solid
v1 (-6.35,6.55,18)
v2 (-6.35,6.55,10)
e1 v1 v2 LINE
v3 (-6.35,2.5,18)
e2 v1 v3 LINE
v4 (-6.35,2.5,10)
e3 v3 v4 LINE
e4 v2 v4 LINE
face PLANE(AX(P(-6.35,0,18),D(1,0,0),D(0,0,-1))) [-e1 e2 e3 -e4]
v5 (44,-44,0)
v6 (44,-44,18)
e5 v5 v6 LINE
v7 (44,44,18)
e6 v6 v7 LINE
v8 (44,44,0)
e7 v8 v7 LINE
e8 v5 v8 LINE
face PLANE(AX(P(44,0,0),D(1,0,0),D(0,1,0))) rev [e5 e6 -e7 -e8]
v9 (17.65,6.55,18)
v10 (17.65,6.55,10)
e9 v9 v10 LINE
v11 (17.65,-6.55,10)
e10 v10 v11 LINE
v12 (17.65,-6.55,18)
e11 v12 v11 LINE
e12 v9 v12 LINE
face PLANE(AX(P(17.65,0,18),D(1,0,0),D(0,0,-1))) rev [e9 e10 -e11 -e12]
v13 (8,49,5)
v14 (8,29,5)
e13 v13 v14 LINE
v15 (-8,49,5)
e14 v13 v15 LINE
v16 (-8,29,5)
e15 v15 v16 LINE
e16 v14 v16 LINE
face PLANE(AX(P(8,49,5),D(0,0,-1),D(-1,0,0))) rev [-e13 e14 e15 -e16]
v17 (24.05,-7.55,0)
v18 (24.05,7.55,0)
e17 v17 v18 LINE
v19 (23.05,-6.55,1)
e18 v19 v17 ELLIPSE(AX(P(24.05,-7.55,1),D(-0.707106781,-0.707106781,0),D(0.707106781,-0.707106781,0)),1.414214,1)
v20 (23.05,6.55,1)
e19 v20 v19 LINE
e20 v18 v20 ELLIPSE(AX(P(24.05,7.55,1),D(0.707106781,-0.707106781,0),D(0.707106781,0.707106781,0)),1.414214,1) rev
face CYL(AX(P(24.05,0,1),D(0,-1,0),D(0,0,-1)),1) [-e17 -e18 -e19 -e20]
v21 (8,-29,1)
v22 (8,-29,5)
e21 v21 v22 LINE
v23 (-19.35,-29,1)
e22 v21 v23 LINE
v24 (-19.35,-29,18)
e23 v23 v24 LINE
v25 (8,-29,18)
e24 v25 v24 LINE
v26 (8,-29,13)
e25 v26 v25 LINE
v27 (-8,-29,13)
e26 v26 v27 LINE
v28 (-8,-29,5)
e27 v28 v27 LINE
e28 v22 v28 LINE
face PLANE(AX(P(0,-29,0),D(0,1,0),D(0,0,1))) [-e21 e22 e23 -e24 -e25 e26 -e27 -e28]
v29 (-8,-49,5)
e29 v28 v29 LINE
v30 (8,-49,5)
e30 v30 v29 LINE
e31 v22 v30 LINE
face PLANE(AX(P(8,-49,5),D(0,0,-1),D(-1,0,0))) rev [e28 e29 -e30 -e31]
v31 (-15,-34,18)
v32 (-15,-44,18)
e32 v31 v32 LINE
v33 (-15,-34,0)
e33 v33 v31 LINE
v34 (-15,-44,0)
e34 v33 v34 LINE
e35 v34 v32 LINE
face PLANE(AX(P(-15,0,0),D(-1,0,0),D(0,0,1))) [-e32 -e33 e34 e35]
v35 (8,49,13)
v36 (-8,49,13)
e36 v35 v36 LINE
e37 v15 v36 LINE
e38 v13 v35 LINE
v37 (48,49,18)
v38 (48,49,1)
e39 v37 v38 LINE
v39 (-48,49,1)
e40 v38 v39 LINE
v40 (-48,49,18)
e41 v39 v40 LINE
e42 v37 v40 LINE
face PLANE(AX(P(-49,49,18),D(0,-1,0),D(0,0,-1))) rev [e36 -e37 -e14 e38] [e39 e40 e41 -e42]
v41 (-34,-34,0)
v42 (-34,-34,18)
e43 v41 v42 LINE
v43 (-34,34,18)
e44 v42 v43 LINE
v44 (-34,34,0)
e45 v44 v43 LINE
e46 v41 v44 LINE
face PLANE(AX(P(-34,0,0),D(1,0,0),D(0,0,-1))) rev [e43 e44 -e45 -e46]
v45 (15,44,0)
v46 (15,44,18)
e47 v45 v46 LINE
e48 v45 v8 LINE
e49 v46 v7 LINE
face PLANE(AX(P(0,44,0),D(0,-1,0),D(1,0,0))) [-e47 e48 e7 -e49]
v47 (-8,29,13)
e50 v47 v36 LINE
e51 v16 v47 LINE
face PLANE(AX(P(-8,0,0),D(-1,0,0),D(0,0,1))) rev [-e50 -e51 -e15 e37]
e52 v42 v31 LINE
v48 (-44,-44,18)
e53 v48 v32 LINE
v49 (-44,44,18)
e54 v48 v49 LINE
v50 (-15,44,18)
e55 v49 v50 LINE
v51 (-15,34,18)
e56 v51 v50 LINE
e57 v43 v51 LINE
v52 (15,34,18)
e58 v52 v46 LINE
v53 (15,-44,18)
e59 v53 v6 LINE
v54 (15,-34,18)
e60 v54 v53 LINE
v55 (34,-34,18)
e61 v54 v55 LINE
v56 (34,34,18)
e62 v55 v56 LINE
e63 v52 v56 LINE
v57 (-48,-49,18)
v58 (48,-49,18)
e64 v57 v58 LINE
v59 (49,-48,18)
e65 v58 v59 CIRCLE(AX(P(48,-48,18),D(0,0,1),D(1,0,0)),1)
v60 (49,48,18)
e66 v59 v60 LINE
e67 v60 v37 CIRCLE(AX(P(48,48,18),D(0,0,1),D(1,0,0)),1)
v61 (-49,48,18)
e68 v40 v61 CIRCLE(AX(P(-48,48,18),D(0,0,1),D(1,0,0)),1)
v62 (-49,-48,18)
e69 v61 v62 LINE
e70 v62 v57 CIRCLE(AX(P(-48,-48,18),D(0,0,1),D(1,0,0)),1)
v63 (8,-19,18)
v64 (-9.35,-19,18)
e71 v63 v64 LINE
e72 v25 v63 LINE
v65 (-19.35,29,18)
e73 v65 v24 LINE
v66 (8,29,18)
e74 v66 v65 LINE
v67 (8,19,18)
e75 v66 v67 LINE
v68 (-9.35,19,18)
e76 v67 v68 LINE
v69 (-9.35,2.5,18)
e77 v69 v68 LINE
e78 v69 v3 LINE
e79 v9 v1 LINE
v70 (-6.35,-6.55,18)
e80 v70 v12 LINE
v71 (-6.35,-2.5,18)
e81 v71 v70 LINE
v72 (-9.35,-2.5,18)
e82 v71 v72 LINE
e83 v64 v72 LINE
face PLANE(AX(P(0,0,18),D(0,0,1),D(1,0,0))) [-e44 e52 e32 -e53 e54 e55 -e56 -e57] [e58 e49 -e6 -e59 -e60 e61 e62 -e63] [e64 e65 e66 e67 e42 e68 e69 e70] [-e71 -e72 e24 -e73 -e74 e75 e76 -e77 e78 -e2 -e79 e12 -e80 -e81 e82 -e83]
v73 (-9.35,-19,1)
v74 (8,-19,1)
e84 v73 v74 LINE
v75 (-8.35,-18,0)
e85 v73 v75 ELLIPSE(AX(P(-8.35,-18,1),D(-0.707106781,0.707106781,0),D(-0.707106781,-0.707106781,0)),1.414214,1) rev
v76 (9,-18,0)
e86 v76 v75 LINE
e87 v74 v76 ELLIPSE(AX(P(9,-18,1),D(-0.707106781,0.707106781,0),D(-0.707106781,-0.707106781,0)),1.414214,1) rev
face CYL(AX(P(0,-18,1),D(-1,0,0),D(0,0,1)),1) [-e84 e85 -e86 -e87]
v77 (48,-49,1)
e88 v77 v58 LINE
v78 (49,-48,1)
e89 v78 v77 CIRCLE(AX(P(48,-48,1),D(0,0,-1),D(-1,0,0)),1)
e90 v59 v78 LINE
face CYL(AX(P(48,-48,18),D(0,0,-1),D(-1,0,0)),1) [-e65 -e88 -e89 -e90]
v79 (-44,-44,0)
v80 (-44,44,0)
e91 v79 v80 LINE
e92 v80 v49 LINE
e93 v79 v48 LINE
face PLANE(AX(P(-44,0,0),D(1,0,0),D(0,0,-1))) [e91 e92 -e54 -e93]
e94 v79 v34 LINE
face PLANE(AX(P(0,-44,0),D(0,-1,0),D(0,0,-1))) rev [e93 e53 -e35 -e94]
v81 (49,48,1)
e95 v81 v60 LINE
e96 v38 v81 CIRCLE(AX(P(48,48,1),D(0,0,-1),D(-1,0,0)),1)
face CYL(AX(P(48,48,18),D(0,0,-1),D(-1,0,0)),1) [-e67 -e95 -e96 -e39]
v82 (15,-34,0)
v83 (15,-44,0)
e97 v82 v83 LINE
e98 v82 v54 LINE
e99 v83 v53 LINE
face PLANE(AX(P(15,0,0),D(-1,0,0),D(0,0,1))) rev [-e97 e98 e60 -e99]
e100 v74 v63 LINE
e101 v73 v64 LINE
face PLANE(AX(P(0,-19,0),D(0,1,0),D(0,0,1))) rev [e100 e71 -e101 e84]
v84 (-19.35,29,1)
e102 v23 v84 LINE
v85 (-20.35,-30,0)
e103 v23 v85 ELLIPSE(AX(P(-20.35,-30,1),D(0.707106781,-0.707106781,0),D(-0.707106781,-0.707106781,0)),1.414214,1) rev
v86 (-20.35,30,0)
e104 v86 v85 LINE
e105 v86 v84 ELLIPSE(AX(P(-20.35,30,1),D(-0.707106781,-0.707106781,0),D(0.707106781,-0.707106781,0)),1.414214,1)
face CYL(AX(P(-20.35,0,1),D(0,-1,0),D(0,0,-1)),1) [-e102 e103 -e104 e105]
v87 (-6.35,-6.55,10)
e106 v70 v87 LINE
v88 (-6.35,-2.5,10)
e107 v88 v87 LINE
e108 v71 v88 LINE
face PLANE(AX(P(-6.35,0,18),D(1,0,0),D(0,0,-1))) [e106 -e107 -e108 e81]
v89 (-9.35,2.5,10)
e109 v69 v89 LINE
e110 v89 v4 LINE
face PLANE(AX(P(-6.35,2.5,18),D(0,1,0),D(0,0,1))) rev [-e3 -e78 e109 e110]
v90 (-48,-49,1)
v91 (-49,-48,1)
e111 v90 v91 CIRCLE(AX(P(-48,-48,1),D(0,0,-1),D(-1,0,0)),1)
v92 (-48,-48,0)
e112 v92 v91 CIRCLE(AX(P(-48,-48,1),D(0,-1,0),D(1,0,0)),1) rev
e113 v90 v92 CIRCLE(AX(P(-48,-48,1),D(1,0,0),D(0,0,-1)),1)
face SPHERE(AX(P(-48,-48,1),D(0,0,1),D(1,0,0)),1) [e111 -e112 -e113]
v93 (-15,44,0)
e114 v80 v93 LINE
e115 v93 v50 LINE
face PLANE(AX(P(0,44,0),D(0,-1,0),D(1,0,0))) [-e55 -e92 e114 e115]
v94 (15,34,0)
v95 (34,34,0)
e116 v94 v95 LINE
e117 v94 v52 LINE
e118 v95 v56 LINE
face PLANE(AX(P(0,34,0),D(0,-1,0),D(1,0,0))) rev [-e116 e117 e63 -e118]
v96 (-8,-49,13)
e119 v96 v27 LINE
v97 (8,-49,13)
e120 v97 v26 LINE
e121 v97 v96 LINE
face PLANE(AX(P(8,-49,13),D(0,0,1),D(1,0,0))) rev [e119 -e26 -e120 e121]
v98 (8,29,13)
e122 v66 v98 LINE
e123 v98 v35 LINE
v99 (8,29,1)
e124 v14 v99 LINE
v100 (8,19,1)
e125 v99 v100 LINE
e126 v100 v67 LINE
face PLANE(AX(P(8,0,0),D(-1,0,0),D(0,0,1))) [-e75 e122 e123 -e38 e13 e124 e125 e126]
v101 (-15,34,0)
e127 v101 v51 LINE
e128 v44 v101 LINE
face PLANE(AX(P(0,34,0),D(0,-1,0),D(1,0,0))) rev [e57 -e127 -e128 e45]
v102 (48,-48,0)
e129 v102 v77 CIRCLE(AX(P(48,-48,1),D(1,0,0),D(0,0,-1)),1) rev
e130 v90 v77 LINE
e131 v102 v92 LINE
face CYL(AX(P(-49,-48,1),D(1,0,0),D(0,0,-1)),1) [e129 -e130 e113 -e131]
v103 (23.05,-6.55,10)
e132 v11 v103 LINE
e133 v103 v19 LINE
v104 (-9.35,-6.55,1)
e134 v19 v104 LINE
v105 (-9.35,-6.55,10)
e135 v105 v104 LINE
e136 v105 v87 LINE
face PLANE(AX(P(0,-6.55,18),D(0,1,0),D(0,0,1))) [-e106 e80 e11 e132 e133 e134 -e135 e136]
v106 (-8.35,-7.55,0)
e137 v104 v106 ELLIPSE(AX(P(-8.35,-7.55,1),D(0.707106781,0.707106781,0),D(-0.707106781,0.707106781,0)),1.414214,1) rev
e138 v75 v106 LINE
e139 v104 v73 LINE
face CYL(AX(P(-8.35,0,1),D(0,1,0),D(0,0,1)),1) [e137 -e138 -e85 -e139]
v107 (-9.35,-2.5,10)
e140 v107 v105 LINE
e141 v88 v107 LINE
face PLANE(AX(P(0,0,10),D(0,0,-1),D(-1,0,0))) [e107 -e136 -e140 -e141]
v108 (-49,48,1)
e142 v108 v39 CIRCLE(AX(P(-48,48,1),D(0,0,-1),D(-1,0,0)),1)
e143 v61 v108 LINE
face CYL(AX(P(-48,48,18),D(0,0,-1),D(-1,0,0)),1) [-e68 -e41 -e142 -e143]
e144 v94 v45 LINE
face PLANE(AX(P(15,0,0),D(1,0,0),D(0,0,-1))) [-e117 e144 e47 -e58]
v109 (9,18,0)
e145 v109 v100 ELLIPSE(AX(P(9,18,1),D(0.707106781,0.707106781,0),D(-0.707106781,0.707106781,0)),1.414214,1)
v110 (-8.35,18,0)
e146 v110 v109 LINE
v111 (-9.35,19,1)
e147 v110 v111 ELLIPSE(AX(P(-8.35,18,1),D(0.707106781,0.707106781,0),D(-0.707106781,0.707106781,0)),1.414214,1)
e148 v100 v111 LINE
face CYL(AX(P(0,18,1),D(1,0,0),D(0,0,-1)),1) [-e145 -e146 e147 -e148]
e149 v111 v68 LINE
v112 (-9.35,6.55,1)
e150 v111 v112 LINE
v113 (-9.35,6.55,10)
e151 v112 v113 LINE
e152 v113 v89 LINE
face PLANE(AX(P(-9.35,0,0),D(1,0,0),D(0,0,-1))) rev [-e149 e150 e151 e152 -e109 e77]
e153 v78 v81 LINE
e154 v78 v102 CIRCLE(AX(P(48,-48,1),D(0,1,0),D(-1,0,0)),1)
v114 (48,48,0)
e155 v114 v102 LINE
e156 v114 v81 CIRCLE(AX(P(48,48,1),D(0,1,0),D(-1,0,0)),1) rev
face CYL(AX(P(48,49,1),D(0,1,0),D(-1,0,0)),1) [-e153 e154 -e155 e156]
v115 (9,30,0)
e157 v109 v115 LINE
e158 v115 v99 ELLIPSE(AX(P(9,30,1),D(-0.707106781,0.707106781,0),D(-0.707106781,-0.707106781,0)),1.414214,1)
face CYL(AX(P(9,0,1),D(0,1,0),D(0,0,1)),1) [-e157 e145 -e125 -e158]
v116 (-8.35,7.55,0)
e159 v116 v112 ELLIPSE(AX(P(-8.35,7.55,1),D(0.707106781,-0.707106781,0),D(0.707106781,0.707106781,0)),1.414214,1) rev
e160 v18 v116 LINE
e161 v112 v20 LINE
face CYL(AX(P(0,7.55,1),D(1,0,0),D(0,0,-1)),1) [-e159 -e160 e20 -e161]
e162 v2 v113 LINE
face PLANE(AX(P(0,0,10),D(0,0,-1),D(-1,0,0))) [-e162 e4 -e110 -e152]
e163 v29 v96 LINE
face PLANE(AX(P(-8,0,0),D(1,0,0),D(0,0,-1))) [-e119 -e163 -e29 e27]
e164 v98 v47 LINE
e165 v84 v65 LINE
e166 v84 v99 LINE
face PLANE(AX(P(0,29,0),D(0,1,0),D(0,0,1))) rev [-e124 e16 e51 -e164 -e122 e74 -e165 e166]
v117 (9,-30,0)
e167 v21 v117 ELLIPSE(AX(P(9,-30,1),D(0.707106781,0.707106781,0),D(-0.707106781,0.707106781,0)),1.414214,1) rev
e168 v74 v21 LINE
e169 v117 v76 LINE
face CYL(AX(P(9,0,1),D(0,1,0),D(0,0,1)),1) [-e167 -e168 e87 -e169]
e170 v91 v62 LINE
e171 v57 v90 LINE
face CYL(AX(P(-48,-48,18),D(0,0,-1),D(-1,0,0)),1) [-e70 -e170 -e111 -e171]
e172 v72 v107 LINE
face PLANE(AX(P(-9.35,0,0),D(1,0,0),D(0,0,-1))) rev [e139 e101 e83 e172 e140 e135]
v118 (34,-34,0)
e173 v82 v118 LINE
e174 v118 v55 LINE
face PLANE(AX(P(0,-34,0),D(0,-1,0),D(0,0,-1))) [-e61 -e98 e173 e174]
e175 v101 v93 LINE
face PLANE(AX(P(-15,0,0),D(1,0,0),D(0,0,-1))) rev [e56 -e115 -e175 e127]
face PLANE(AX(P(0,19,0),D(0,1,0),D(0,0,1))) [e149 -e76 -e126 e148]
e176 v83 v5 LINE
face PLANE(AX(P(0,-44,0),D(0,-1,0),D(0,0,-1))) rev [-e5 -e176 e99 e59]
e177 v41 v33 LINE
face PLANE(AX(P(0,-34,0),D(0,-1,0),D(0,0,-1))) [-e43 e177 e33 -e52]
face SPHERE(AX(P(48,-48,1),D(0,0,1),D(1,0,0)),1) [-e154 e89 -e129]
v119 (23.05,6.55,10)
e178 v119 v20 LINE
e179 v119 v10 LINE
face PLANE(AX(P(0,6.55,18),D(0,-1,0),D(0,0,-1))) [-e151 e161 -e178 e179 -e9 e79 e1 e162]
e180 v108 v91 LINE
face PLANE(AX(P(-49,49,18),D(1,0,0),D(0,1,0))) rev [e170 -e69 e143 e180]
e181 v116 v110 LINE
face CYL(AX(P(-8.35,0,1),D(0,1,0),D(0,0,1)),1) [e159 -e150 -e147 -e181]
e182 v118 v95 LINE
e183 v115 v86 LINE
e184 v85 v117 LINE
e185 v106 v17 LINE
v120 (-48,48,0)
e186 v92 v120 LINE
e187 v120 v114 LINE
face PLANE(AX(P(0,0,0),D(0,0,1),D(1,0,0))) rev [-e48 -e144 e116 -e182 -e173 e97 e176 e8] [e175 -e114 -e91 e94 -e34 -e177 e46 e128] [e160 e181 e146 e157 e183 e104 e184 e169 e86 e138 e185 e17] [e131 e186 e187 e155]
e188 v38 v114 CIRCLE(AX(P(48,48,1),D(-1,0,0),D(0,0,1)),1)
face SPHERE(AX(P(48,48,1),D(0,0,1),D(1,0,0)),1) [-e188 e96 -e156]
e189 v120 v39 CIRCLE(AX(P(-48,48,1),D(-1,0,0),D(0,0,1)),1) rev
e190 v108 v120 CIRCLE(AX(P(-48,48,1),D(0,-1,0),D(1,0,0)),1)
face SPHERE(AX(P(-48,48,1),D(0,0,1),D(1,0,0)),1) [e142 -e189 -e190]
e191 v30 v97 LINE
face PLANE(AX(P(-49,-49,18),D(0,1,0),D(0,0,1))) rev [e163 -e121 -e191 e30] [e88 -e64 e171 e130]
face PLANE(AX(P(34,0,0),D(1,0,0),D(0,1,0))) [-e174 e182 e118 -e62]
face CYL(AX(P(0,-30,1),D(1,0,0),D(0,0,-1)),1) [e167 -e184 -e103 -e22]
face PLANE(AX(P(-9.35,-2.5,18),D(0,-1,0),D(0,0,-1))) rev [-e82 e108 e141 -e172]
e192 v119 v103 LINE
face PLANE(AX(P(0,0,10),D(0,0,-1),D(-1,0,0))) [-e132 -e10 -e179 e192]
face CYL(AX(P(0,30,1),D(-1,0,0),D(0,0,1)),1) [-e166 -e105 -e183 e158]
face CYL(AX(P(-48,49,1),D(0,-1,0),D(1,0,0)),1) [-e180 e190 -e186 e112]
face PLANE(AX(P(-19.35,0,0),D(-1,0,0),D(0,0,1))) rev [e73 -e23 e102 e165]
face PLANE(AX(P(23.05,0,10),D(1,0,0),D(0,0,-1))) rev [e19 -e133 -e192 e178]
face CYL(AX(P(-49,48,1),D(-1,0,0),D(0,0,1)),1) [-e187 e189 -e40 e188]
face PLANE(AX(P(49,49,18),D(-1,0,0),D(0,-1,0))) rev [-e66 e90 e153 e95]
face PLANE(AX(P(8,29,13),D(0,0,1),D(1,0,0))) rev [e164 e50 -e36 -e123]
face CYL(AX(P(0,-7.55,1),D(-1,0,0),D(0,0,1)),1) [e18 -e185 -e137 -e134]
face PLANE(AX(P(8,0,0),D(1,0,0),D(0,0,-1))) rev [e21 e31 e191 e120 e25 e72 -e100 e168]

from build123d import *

# Parameters (mm, degrees)
SKETCH1_W           = 98
SKETCH1_H           = 98
BOSS_EXTRUDE1_DEPTH = 18
SKETCH2_W           = 24
SKETCH2_H           = 13.1
CUT_EXTRUDE1_DEPTH  = 18
SKETCH2_4_W         = 5.2
SKETCH2_4_H         = 12.7
SKETCH2_4_H_2       = 0.2
CUT_EXTRUDE2_DEPTH  = 10
CUT_EXTRUDE3_DEPTH  = 8
SKETCH5_W           = 10
SKETCH5_H           = 5
CUT_EXTRUDE4_DEPTH  = 18
SKETCH6_W           = 5
SKETCH6_H           = 20
BOSS_EXTRUDE2_DEPTH = 16
FILLET1_R           = 1
FILLET2_R           = 1
CUT_EXTRUDE5_DEPTH  = 18


with BuildPart() as part:
    # Sketch1 → Boss-Extrude1 (new body)
    with BuildSketch(Plane.XY):
        Rectangle(SKETCH1_W, SKETCH1_H)
    extrude(amount=BOSS_EXTRUDE1_DEPTH)

    # Sketch2 → Cut-Extrude1 (cut)
    with BuildSketch(Plane(origin=(0, 0, 0), x_dir=(-1, 0, 0), z_dir=(0, 0, -1))):
        with Locations((-5.65, 0)):
            Rectangle(SKETCH2_W, SKETCH2_H)
    extrude(amount=-CUT_EXTRUDE1_DEPTH, mode=Mode.SUBTRACT)

    # Sketch2<4> → Cut-Extrude2 (cut)
    with BuildSketch(Plane(origin=(0, 0, 0), x_dir=(-1, 0, 0), z_dir=(0, 0, -1))):
        with Locations((-20.25, 0)):
            Rectangle(SKETCH2_4_W, SKETCH2_4_H)
        Polygon((-22.85, 6.35), (-17.65, 6.35), (-17.65, 6.55), (-22.85, 6.55), (-23.05, 6.55), (-23.05, 6.35), (-23.05, -6.55), (-17.65, -6.55), (-17.65, -6.35), (-22.85, -6.35), align=None)
        Polygon((11.55, 6.35), (6.35, 6.35), (6.35, 0), (6.35, -6.15), (11.55, -6.15), align=None)
        Polygon((6.35, 6.55), (6.35, 6.35), (11.55, 6.35), (11.55, -6.15), (11.55, -6.35), (6.35, -6.35), (6.35, -6.55), (11.55, -6.55), (11.75, -6.55), (11.75, -6.35), (11.75, 6.55), align=None)
        with Locations((8.95, -6.25)):
            Rectangle(SKETCH2_4_W, SKETCH2_4_H_2)
    extrude(amount=-CUT_EXTRUDE2_DEPTH, mode=Mode.SUBTRACT)

    # Sketch4 → Cut-Extrude3 (cut)
    with BuildSketch(Plane(origin=(0, 0, 10), x_dir=(-1, 0, 0), z_dir=(0, 0, -1))):
        Polygon((6.35, 0), (6.35, 2.5), (9.35, 2.5), (9.35, -2.5), (6.35, -2.5), align=None)
    extrude(amount=-CUT_EXTRUDE3_DEPTH, mode=Mode.SUBTRACT)

    # Sketch5 → Cut-Extrude4 (cut)
    with BuildSketch(Plane.XY.offset(18)):
        with Locations((-14.35, 0)):
            Rectangle(SKETCH5_W, SKETCH5_H)
        Polygon((-19.35, 2.5), (-9.35, 2.5), (-9.35, 19), (8, 19), (8, 29), (8, 49), (0, 49), (-8, 49), (-8, 29), (-19.35, 29), align=None)
        Polygon((-9.35, -19), (-9.35, -2.5), (-19.35, -2.5), (-19.35, -29), (-8, -29), (-8, -49), (0, -49), (8, -49), (8, -29), (8, -19), align=None)
    extrude(amount=-CUT_EXTRUDE4_DEPTH, mode=Mode.SUBTRACT)


with BuildPart() as cut_extrude4_piece_1:
    # of the separate pieces the step leaves, piece 1, a body of its own (cut_extrude4_pieces)
    add(part.part.solids().sort_by_distance((8, 49, 0))[0])



with BuildPart() as cut_extrude4_piece_2:
    # of the separate pieces the step leaves, piece 2, a body of its own (cut_extrude4_pieces)
    add(part.part.solids().sort_by_distance((-49, 49, 0))[0])


with BuildPart() as cut_extrude4_piece_1_1:
    add(cut_extrude4_piece_1.part)

    add(cut_extrude4_piece_2.part)  # Boss-Extrude2 merges Cut-Extrude4 piece 2
    # Sketch6 → Boss-Extrude2 (add)
    with BuildSketch(Plane(origin=(-8, 0, 0), x_dir=(0, 0, -1), z_dir=(1, 0, 0))):
        with Locations((-15.5, 39)):
            Rectangle(SKETCH6_W, SKETCH6_H)
        with Locations((-2.5, 39)):
            Rectangle(SKETCH6_W, SKETCH6_H)
        with Locations((-15.5, -39)):
            Rectangle(SKETCH6_W, SKETCH6_H)
        with Locations((-2.5, -39)):
            Rectangle(SKETCH6_W, SKETCH6_H)
    extrude(amount=BOSS_EXTRUDE2_DEPTH)

    # Fillet1
    fillet1_edges = [cut_extrude4_piece_1_1.edges().sort_by_distance(p)[0] for p in [
        (-19.35, 0, 0),
        (-5.675, 29, 0),
        (-5.675, -29, 0),
        (-0.675, -19, 0),
        (-9.35, -12.775, 0),
        (6.85, -6.55, 0),
        (6.85, 6.55, 0),
        (-9.35, 12.775, 0),
        (49, 0, 0),
        (23.05, 0, 0),
        (-0.675, 19, 0),
        (8, 24, 0),
        (8, -24, 0),
        (0, -49, 0),
        (-49, 0, 0),
        (0, 49, 0),
    ]]
    fillet(fillet1_edges, radius=FILLET1_R)

    # Fillet2
    # the kernel refuses this fillet: 1 mm, written as the material it takes off along each edge
    with BuildSketch(Plane(origin=(48, -48, 1), x_dir=(0, -1, 0), z_dir=(1, 0, 0))) as fillet2_piece_1_section:
        Polygon((0, 0), (FILLET2_R, 0), (FILLET2_R, FILLET2_R), (0, FILLET2_R), align=None)
    fillet2_piece_1 = extrude(amount=FILLET2_R, mode=Mode.PRIVATE)
    fillet2_piece_1 = fillet2_piece_1 - Plane(origin=(48, -48, 1), x_dir=(0, 0.7071067811865475, 0.7071067811865475), z_dir=(1, 0, 0)) * Sphere(FILLET2_R, mode=Mode.PRIVATE)
    add(fillet2_piece_1, mode=Mode.SUBTRACT)
    with BuildSketch(Plane(origin=(-48, -48, 1), x_dir=(0, -1, 0), z_dir=(-1, 0, 0))) as fillet2_piece_2_section:
        Polygon((0, 0), (FILLET2_R, 0), (FILLET2_R, -FILLET2_R), (0, -FILLET2_R), align=None)
    fillet2_piece_2 = extrude(amount=FILLET2_R, mode=Mode.PRIVATE)
    fillet2_piece_2 = fillet2_piece_2 - Plane(origin=(-48, -48, 1), x_dir=(0, 0.7071067811865475, 0.7071067811865475), z_dir=(-1, 0, 0)) * Sphere(FILLET2_R, mode=Mode.PRIVATE)
    add(fillet2_piece_2, mode=Mode.SUBTRACT)
    with BuildSketch(Plane(origin=(48, 48, 1), x_dir=(1, 0, 0), z_dir=(0, 1, 0))) as fillet2_piece_3_section:
        Polygon((0, 0), (FILLET2_R, 0), (FILLET2_R, FILLET2_R), (0, FILLET2_R), align=None)
    fillet2_piece_3 = extrude(amount=FILLET2_R, mode=Mode.PRIVATE)
    fillet2_piece_3 = fillet2_piece_3 - Plane(origin=(48, 48, 1), x_dir=(-0.7071067811865475, 0, 0.7071067811865475), z_dir=(0, 1, 0)) * Sphere(FILLET2_R, mode=Mode.PRIVATE)
    add(fillet2_piece_3, mode=Mode.SUBTRACT)
    with BuildSketch(Plane(origin=(-48, 48, 1), x_dir=(-1, 0, 0), z_dir=(0, 1, 0))) as fillet2_piece_4_section:
        Polygon((0, 0), (FILLET2_R, 0), (FILLET2_R, -FILLET2_R), (0, -FILLET2_R), align=None)
    fillet2_piece_4 = extrude(amount=FILLET2_R, mode=Mode.PRIVATE)
    fillet2_piece_4 = fillet2_piece_4 - Plane(origin=(-48, 48, 1), x_dir=(0.7071067811865475, 0, 0.7071067811865475), z_dir=(0, 1, 0)) * Sphere(FILLET2_R, mode=Mode.PRIVATE)
    add(fillet2_piece_4, mode=Mode.SUBTRACT)
    with BuildSketch(Plane(origin=(49, 49, 1), x_dir=(-1, 0, 0), z_dir=(0, 0, 1)), Plane(origin=(49, -49, 1), x_dir=(0, 1, 0), z_dir=(0, 0, 1))) as fillet2_piece_5:
        with BuildLine():
            CenterArc((FILLET2_R, FILLET2_R), FILLET2_R, 180, 90)
            Line((0, FILLET2_R), (0, 0))
            Line((0, 0), (FILLET2_R, 0))
        make_face()
    extrude(amount=19.5, mode=Mode.SUBTRACT)
    with BuildSketch(Plane(origin=(-49, -49, 1), x_dir=(0, 1, 0), z_dir=(0, 0, 1)), Plane(origin=(-49, 49, 1), x_dir=(1, 0, 0), z_dir=(0, 0, 1))) as fillet2_piece_6:
        with BuildLine():
            CenterArc((FILLET2_R, -FILLET2_R), FILLET2_R, 90, 90)
            Line((0, -FILLET2_R), (0, 0))
            Line((0, 0), (FILLET2_R, 0))
        make_face()
    extrude(amount=19.5, mode=Mode.SUBTRACT)

    # Sketch8 → Cut-Extrude5 (cut)
    with BuildSketch(Plane.XY.offset(18)):
        Polygon((-15, -34), (-34, -34), (-34, 34), (-15, 34), (-15, 44), (-44, 44), (-44, -44), (-15, -44), align=None)
        Polygon((34, -34), (15, -34), (15, -44), (44, -44), (44, 44), (15, 44), (15, 34), (34, 34), align=None)
    extrude(amount=-CUT_EXTRUDE5_DEPTH, mode=Mode.SUBTRACT)


solid = cut_extrude4_piece_1_1.part
